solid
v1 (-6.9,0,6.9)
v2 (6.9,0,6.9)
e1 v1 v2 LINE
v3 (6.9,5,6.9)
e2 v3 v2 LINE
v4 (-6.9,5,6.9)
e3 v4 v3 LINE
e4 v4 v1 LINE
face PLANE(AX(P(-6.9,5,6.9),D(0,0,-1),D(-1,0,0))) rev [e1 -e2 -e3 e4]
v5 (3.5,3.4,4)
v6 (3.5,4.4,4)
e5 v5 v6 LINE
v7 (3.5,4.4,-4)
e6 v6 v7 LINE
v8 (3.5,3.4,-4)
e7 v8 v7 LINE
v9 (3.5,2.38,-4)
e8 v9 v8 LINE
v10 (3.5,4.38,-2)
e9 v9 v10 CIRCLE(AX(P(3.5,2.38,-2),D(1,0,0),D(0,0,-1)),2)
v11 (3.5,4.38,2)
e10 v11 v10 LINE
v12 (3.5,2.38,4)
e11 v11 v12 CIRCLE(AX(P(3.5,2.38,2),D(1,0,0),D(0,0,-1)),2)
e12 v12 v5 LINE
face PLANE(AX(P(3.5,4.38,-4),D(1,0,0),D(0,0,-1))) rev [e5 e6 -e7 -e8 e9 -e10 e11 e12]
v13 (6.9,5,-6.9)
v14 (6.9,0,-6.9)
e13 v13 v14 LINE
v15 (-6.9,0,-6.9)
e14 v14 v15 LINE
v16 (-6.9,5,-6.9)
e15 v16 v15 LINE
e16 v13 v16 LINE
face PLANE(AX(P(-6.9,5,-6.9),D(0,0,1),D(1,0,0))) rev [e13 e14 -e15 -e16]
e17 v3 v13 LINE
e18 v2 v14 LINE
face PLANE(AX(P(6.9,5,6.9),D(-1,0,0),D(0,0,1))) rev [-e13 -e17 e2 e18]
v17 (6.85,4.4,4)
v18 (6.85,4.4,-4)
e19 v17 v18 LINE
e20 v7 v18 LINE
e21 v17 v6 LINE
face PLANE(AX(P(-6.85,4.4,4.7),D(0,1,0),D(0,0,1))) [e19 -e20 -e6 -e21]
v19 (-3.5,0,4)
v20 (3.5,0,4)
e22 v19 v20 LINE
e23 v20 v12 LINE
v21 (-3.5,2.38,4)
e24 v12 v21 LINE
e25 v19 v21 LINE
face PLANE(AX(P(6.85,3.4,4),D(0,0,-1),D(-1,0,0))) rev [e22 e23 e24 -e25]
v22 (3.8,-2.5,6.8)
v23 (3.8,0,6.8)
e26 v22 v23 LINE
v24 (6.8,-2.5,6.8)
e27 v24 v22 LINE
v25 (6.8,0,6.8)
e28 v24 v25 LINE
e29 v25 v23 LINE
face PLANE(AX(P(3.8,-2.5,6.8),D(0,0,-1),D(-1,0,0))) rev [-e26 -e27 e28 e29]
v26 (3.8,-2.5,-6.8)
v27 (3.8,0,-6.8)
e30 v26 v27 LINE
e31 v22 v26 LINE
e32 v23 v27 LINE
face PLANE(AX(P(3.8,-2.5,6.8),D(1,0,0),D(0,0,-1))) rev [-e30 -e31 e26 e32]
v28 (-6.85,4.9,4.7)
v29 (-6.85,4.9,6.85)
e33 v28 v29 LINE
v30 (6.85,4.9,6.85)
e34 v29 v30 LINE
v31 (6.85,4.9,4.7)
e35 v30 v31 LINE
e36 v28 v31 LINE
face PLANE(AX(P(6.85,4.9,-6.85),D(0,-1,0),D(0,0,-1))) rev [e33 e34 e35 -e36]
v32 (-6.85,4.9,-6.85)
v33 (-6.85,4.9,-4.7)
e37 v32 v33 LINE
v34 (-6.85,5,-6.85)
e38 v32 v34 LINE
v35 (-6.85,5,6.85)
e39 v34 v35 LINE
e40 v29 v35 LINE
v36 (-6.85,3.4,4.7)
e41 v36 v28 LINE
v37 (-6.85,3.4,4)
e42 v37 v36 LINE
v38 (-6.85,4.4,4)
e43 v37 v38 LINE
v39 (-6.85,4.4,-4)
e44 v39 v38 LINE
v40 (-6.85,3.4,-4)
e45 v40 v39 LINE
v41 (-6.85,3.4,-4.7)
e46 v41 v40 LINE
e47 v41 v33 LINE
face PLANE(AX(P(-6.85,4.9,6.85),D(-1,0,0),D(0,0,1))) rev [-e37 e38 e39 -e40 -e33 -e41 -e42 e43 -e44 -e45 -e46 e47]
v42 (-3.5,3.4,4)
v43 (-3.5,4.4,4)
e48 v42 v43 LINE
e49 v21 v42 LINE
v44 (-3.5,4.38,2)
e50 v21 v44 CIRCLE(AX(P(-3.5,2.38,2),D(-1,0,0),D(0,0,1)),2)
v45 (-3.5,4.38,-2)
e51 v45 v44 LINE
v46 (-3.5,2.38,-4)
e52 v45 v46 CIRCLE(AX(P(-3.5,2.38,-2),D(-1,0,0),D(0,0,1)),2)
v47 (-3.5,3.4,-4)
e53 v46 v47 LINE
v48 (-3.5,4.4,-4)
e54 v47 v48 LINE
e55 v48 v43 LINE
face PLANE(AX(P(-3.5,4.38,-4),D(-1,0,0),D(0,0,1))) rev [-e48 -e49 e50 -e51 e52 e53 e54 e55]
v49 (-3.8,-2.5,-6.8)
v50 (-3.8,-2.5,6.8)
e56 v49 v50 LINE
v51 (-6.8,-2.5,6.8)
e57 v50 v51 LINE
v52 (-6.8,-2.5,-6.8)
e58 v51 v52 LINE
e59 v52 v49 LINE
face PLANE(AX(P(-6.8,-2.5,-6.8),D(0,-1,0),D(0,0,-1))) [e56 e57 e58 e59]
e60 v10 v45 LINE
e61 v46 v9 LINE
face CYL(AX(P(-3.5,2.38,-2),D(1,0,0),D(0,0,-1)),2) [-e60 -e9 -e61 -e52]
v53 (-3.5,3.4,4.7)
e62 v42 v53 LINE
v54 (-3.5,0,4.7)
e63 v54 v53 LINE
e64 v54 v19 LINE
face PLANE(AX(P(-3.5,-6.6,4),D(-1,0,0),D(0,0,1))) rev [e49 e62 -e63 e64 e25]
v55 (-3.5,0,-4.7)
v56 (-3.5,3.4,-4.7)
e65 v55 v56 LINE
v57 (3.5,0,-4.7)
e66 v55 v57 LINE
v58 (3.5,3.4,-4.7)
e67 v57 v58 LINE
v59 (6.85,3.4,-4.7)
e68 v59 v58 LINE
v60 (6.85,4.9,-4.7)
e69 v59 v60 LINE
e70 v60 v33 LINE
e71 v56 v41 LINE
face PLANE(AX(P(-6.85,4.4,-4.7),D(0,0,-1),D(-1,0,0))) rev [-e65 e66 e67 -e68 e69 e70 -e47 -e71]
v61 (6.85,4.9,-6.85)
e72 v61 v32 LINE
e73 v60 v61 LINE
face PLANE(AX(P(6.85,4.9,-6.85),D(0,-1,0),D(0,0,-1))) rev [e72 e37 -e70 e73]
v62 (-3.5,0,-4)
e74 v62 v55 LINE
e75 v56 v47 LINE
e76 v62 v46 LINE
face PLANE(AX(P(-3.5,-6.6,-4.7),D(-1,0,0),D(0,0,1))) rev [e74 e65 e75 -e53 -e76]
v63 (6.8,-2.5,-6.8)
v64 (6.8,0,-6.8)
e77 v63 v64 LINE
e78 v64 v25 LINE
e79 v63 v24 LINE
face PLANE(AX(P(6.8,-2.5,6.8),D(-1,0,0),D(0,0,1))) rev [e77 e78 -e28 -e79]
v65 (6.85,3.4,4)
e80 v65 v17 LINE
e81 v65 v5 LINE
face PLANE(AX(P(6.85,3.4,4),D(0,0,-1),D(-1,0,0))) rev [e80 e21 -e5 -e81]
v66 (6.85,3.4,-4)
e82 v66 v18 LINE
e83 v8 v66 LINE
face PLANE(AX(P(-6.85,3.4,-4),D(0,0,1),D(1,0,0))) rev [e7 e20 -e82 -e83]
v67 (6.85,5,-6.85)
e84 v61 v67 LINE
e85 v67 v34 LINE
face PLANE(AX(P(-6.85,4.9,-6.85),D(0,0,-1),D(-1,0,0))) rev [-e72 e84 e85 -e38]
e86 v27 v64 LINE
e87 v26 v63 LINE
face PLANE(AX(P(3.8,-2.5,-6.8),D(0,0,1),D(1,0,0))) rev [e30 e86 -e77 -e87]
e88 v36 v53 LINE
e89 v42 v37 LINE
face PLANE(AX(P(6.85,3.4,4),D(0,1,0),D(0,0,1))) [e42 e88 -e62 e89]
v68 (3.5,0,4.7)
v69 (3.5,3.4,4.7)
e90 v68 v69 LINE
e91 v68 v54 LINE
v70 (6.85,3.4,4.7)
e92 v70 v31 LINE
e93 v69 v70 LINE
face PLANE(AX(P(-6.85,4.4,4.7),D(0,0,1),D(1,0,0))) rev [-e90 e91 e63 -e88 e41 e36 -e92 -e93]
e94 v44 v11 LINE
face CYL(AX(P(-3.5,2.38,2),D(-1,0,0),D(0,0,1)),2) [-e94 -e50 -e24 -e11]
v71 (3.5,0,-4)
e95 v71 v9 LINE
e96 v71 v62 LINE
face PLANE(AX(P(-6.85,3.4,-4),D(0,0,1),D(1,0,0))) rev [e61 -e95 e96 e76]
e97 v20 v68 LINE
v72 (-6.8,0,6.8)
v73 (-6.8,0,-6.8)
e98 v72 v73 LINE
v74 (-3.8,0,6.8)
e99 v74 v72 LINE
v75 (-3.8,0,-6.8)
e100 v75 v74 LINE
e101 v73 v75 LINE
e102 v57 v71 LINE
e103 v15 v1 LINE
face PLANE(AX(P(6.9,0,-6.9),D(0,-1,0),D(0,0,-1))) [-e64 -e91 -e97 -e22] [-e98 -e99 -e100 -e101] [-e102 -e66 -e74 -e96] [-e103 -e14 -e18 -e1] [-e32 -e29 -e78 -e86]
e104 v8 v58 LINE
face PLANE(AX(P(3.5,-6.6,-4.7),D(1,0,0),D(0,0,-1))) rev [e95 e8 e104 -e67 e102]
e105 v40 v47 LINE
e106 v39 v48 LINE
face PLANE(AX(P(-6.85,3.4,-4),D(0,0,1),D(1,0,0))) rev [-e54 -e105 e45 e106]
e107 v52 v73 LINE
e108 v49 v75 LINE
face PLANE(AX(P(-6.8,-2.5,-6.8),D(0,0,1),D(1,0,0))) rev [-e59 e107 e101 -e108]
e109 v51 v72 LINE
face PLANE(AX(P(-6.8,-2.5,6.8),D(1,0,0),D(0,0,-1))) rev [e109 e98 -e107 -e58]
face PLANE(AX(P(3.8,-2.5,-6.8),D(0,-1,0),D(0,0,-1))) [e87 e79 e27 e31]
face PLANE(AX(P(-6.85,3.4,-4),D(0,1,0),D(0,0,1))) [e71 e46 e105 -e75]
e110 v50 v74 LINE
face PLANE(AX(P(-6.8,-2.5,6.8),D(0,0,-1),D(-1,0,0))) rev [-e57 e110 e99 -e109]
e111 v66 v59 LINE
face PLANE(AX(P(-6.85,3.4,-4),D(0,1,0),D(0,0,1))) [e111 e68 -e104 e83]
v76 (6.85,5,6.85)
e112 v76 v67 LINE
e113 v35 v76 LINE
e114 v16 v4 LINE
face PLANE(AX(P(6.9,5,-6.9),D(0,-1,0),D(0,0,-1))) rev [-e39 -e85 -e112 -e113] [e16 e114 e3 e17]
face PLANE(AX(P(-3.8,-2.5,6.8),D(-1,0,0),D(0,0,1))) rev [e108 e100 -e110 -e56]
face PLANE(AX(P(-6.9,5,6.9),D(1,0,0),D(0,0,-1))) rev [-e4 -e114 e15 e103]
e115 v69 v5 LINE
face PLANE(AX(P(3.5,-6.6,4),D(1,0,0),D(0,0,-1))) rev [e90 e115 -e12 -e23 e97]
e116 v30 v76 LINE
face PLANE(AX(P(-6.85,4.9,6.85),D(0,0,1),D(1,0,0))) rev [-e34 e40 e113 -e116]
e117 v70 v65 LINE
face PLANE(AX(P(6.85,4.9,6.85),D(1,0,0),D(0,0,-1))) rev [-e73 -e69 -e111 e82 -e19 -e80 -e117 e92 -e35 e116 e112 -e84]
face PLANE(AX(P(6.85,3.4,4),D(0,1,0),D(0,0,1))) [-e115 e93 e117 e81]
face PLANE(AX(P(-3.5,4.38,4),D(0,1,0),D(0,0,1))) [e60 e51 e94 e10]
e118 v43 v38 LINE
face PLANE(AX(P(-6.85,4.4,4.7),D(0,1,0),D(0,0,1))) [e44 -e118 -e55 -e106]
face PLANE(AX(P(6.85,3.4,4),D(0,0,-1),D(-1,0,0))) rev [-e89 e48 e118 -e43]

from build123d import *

# Parameters (mm, degrees)
ESBO_O1_W                = 13.8
ESBO_O1_H                = 13.8
RESSALTO_EXTRUS_O1_DEPTH = 5
ESBO_O3_W                = 3
ESBO_O3_H                = 13.6
RESSALTO_EXTRUS_O3_DEPTH = 2.5
ESBO_O4_W                = 13.7
ESBO_O4_H                = 13.7
CORTE_EXTRUS_O1_DEPTH    = 0.1
ESBO_O5_W                = 13.7
ESBO_O5_H                = 9.4
CORTE_EXTRUS_O2_DEPTH    = 0.5
ESBO_O6_W                = 13.7
ESBO_O6_H                = 0.7
CORTE_EXTRUS_O3_DEPTH    = 1
ESBO_O7_W                = 7
ESBO_O7_H                = 0.7
CORTE_EXTRUS_O4_DEPTH    = 10
ESBO_O8_W                = 7
ESBO_O8_H                = 8
CORTE_EXTRUS_O5_DEPTH    = 0.02
FILETE1_R                = 2


with BuildPart() as part:
    # Esboço1 → Ressalto-extrusão1 (new body)
    with BuildSketch(Plane(origin=(0, 0, 0), x_dir=(1, 0, 0), z_dir=(0, 1, 0))):
        Rectangle(ESBO_O1_W, ESBO_O1_H)
    extrude(amount=RESSALTO_EXTRUS_O1_DEPTH)

    # Esboço3 → Ressalto-extrusão3 (add)
    with BuildSketch(Plane.XZ):
        with Locations((-5.3, 0)):
            Rectangle(ESBO_O3_W, ESBO_O3_H)
        with Locations((5.3, 0)):
            Rectangle(ESBO_O3_W, ESBO_O3_H)
    extrude(amount=RESSALTO_EXTRUS_O3_DEPTH)

    # Esboço4 → Corte-extrusão1 (cut)
    with BuildSketch(Plane(origin=(0, 5, 0), x_dir=(1, 0, 0), z_dir=(0, 1, 0))):
        Rectangle(ESBO_O4_W, ESBO_O4_H)
    extrude(amount=-CORTE_EXTRUS_O1_DEPTH, mode=Mode.SUBTRACT)

    # Esboço5 → Corte-extrusão2 (cut)
    with BuildSketch(Plane(origin=(0, 4.9, 0), x_dir=(1, 0, 0), z_dir=(0, 1, 0))):
        Rectangle(ESBO_O5_W, ESBO_O5_H)
    extrude(amount=-CORTE_EXTRUS_O2_DEPTH, mode=Mode.SUBTRACT)

    # Esboço6 → Corte-extrusão3 (cut)
    with BuildSketch(Plane(origin=(0, 4.4, 0), x_dir=(-1, 0, 0), z_dir=(0, 1, 0))):
        with Locations((0, -4.35)):
            Rectangle(ESBO_O6_W, ESBO_O6_H)
        with Locations((0, 4.35)):
            Rectangle(ESBO_O6_W, ESBO_O6_H)
    extrude(amount=-CORTE_EXTRUS_O3_DEPTH, mode=Mode.SUBTRACT)

    # Esboço7 → Corte-extrusão4 (cut)
    with BuildSketch(Plane(origin=(0, 3.4, 0), x_dir=(1, 0, 0), z_dir=(0, 1, 0))):
        with Locations((0, 4.35)):
            Rectangle(ESBO_O7_W, ESBO_O7_H)
        with Locations((0, -4.35)):
            Rectangle(ESBO_O7_W, ESBO_O7_H)
    extrude(amount=-CORTE_EXTRUS_O4_DEPTH, mode=Mode.SUBTRACT)

    # Esboço8 → Corte-extrusão5 (cut)
    with BuildSketch(Plane(origin=(0, 4.4, 0), x_dir=(1, 0, 0), z_dir=(0, 1, 0))):
        Rectangle(ESBO_O8_W, ESBO_O8_H)
    extrude(amount=-CORTE_EXTRUS_O5_DEPTH, mode=Mode.SUBTRACT)

    # Filete1
    # the kernel refuses this fillet: 2 mm, written as the material it takes off along each edge
    with BuildSketch(Plane(origin=(-3.5, 4.38, -4), x_dir=(0, -1, 0), z_dir=(1, 0, 0)), Plane(origin=(3.5, 4.38, 4), x_dir=(0, -1, 0), z_dir=(-1, 0, 0))) as filete1_piece_1:
        with BuildLine():
            CenterArc((FILETE1_R, -FILETE1_R), FILETE1_R, 90, 90)
            Line((0, -FILETE1_R), (0, 0))
            Line((0, 0), (FILETE1_R, 0))
        make_face()
    extrude(amount=7, mode=Mode.SUBTRACT)


solid = part.part
